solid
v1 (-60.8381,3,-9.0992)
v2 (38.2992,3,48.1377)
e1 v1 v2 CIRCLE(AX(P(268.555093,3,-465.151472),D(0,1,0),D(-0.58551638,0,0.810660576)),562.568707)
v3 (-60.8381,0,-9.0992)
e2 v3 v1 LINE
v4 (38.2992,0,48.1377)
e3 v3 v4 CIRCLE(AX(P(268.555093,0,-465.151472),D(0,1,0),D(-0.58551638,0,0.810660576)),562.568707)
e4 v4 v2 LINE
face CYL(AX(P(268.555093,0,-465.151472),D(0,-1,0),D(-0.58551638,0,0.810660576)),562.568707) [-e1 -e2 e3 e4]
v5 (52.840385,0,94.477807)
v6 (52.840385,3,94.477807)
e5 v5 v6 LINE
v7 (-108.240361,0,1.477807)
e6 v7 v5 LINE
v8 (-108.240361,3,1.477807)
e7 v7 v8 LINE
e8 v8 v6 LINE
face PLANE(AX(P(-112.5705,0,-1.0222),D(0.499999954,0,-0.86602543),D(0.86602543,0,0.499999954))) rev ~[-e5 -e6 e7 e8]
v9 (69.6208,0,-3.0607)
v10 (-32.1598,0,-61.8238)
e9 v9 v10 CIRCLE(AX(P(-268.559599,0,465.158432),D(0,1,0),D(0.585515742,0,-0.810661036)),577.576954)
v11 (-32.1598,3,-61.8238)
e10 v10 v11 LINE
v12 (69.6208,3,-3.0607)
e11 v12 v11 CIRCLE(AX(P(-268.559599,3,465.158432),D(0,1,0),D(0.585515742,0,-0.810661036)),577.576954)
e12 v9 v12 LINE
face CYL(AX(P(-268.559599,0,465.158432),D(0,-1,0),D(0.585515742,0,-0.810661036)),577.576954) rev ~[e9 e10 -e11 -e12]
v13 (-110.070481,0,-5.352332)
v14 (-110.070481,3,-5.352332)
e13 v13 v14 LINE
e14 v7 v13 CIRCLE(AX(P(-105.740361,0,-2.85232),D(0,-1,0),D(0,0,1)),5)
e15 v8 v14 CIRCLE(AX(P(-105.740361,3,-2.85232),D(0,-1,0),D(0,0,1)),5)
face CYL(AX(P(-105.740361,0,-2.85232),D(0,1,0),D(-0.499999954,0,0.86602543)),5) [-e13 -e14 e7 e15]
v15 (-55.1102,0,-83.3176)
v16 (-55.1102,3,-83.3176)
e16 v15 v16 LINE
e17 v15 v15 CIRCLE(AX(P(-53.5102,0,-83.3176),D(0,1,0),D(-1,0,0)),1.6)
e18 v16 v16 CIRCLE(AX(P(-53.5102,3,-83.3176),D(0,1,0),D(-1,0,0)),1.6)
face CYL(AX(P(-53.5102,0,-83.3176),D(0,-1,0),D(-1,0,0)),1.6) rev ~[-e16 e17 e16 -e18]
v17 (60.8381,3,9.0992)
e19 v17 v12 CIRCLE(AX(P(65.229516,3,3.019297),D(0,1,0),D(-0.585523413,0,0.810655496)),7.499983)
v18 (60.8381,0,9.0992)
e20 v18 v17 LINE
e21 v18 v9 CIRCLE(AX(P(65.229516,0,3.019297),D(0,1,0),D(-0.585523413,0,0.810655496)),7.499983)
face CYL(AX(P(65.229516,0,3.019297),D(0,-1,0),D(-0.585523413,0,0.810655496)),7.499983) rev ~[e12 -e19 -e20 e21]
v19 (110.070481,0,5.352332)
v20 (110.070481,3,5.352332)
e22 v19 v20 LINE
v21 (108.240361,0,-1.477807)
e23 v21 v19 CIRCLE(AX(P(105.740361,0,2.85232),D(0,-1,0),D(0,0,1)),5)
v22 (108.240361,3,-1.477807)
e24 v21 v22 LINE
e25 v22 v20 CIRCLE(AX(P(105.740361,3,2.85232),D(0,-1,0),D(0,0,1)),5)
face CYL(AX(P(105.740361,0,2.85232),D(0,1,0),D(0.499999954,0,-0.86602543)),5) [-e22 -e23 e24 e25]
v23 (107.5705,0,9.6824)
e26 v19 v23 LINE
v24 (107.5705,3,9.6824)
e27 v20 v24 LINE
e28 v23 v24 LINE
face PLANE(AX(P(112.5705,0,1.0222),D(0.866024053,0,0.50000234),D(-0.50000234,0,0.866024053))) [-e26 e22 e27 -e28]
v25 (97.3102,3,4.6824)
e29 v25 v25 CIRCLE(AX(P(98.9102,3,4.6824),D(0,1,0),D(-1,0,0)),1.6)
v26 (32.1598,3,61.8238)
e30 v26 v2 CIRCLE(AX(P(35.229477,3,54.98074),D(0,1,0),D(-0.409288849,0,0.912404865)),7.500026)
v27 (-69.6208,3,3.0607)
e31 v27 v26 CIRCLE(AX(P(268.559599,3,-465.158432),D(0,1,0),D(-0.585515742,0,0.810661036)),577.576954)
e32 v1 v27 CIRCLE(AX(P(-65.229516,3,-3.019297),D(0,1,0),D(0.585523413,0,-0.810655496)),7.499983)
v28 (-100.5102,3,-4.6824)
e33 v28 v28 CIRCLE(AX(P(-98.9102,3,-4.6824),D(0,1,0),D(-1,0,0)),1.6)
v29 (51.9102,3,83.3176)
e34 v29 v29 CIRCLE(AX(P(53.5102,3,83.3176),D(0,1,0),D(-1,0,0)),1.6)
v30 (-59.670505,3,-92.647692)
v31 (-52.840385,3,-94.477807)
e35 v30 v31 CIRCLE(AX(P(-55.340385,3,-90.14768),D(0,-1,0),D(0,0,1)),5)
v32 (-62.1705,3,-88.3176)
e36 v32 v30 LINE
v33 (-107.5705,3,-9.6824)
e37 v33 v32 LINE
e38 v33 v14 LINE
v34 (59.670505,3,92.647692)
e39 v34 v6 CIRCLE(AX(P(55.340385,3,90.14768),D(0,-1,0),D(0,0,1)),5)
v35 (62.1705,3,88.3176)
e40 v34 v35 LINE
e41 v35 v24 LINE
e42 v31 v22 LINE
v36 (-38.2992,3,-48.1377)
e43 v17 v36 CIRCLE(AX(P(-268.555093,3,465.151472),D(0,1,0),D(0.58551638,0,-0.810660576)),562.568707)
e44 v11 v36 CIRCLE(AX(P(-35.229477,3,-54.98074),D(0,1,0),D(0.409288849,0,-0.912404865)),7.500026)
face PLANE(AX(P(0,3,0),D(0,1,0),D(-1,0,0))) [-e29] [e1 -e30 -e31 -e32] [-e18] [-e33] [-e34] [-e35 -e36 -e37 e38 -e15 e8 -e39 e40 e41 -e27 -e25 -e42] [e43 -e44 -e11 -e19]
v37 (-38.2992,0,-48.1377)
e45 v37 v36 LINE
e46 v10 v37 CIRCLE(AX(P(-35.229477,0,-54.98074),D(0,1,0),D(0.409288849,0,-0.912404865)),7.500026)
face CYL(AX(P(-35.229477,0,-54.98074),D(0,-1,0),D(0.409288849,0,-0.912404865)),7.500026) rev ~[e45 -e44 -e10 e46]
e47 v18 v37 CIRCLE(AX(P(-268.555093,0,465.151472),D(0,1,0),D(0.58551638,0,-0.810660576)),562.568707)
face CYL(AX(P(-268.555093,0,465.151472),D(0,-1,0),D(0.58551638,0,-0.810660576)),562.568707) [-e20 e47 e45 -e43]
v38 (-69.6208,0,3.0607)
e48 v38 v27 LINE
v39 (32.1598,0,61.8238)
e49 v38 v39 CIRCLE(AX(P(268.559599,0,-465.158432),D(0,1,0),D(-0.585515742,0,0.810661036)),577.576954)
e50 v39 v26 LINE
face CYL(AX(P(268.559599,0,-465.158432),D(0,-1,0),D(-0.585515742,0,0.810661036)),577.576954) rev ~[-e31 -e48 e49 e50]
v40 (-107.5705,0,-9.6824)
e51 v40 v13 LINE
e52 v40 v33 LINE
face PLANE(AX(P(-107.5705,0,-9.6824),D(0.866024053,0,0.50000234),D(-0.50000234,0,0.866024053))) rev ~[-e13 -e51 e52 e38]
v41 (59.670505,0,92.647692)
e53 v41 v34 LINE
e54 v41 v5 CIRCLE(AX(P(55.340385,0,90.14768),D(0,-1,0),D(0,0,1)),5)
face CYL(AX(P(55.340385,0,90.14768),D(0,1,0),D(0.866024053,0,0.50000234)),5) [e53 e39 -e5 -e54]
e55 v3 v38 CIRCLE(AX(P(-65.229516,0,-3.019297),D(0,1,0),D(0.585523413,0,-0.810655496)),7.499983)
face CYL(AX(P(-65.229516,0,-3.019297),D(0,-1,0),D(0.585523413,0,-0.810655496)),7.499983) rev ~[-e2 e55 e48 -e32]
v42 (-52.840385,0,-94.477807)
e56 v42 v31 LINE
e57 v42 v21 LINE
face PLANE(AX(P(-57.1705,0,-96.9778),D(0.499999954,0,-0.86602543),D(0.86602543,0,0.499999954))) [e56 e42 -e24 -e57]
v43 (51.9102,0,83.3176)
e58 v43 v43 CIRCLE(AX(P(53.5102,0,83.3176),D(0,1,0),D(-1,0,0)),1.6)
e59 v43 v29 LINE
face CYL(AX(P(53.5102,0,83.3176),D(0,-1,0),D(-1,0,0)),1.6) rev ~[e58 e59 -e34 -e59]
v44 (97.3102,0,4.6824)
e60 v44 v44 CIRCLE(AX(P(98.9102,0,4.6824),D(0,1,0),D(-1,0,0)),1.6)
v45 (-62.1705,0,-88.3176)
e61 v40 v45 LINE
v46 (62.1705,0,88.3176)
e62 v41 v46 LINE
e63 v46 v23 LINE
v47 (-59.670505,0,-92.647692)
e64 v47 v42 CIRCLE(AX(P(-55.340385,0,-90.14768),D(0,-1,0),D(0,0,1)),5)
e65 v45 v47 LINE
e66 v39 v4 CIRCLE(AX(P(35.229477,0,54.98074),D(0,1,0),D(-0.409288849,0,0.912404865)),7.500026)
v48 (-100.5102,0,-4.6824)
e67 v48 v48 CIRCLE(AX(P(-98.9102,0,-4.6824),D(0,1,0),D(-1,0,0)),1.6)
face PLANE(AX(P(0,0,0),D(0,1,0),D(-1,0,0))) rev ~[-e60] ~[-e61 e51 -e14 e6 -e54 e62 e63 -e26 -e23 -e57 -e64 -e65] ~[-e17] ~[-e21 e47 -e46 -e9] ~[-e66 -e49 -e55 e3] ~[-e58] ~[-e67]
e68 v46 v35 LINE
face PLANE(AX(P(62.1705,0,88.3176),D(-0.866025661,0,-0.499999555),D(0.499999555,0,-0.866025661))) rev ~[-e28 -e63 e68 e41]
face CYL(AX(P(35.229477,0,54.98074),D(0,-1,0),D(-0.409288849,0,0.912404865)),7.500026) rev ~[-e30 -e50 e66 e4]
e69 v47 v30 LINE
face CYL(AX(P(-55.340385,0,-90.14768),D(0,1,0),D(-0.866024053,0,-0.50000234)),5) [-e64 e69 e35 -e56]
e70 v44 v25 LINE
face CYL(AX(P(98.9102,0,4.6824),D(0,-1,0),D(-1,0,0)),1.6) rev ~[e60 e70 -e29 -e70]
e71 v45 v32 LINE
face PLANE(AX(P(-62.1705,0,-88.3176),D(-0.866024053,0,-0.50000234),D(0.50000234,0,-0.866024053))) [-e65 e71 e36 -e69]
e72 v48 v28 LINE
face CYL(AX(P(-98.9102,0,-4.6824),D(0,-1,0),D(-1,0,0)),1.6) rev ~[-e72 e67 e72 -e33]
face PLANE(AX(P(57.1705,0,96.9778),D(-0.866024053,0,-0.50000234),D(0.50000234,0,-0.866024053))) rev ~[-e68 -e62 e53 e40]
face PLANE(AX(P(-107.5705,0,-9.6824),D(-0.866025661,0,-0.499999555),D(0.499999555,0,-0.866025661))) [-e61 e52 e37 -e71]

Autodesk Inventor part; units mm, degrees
ref_plane "YZ Plane" through (0, 0, 0) normal (1, 0, 0) x (0, 1, 0)
ref_plane "XZ Plane" through (0, 0, 0) normal (0, 1, 0) x (-1, 0, 0)
ref_plane "XY Plane" through (0, 0, 0) normal (0, 0, 1) x (1, 0, 0)
sketch "Sketch1" plane through (0, 0, 0) normal (0, 1, 0) x (-1, 0, 0)
  circle A0 centre (98.9102, -4.6824) radius 1.6
  circle A1 centre (53.5102, -83.3176) radius 1.6
  circle A2 centre (-98.9102, 4.6824) radius 1.6
  circle A3 centre (-53.5102, 83.3176) radius 1.6
  line L0 (107.5705, -9.6824) -> (62.1705, -88.3176)
  line L1 (-62.1705, 88.3176) -> (-107.5705, 9.6824)
  line L2 (107.5705, -9.6824) -> (112.5705, -1.0222)
  line L3 (112.5705, -1.0222) -> (-57.1705, 96.9778)
  line L4 (112.5705, -1.0222) -> (308.5705, -1.0222) construction
  line L5 (-57.1705, 96.9778) -> (-62.1705, 88.3176)
  line L6 (62.1705, -88.3176) -> (57.1705, -96.9778)
  line L7 (57.1705, -96.9778) -> (-112.5705, 1.0222)
  line L8 (-112.5705, 1.0222) -> (-107.5705, 9.6824)
  line L9 (-15, -25.9808) -> (43, -25.9808) construction
  arc A4 (69.6208, 3.0607) -> (-32.1598, 61.8238) centre (-268.5566, -465.1538) ccw
  arc A5 (60.8381, -9.0992) -> (-38.2992, 48.1377) centre (-268.5566, -465.1538) ccw
  arc A6 (60.8381, -9.0992) -> (69.6208, 3.0607) centre (65.2295, -3.0192) ccw
  arc A7 (-32.1598, 61.8238) -> (-38.2992, 48.1377) centre (-35.2295, 54.9808) ccw
  arc A8 (69.6208, 3.0607) -> (-32.1598, 61.8238) centre (-268.5566, -465.1538) ccw
  arc A9 (60.8381, -9.0992) -> (-38.2992, 48.1377) centre (-268.5566, -465.1538) ccw
  arc A10 (-32.1598, 61.8238) -> (-38.2992, 48.1377) centre (-35.2295, 54.9808) ccw
  arc A11 (60.8381, -9.0992) -> (69.6208, 3.0607) centre (65.2295, -3.0192) ccw
  arc A12 (-69.6208, -3.0607) -> (32.1598, -61.8238) centre (268.5566, 465.1538) ccw
  arc A13 (-60.8381, 9.0992) -> (38.2992, -48.1377) centre (268.5566, 465.1538) ccw
  arc A14 (-60.8381, 9.0992) -> (-69.6208, -3.0607) centre (-65.2295, 3.0192) ccw
  arc A15 (32.1598, -61.8238) -> (38.2992, -48.1377) centre (35.2295, -54.9808) ccw
  point P0 (-50, -7)
  point P1 (-50, -17)
  point P2 (31.0622, -39.8013)
  point P3 (39.7224, -34.8013)
  point P4 (-31.0622, 39.8013)
  point P5 (-39.7224, 34.8013)
  point P6 (50, 7)
  point P7 (50, 17)
  point P8 (18.9378, 46.8013)
  point P9 (10.2776, 51.8013)
  point P10 (-18.9378, -46.8013)
  point P11 (-10.2776, -51.8013)
  point P12 (32.1598, -61.8238)
  dimension "d116" = 10
  dimension "d117" = 10
  dimension "d119" = 150
  dimension "d121" = 90
  dimension "d134" = 15
extrude "Extrusion5" add sketch "Sketch1" along normal blind 3
fillet "Fillet4" radius 5 4 edges at (57.1705, 1.5, 96.9778) (112.5705, 1.5, 1.0222) (-112.5705, 1.5, -1.0222) (-57.1705, 1.5, -96.9778)
properties part number "Tempat Batere"
